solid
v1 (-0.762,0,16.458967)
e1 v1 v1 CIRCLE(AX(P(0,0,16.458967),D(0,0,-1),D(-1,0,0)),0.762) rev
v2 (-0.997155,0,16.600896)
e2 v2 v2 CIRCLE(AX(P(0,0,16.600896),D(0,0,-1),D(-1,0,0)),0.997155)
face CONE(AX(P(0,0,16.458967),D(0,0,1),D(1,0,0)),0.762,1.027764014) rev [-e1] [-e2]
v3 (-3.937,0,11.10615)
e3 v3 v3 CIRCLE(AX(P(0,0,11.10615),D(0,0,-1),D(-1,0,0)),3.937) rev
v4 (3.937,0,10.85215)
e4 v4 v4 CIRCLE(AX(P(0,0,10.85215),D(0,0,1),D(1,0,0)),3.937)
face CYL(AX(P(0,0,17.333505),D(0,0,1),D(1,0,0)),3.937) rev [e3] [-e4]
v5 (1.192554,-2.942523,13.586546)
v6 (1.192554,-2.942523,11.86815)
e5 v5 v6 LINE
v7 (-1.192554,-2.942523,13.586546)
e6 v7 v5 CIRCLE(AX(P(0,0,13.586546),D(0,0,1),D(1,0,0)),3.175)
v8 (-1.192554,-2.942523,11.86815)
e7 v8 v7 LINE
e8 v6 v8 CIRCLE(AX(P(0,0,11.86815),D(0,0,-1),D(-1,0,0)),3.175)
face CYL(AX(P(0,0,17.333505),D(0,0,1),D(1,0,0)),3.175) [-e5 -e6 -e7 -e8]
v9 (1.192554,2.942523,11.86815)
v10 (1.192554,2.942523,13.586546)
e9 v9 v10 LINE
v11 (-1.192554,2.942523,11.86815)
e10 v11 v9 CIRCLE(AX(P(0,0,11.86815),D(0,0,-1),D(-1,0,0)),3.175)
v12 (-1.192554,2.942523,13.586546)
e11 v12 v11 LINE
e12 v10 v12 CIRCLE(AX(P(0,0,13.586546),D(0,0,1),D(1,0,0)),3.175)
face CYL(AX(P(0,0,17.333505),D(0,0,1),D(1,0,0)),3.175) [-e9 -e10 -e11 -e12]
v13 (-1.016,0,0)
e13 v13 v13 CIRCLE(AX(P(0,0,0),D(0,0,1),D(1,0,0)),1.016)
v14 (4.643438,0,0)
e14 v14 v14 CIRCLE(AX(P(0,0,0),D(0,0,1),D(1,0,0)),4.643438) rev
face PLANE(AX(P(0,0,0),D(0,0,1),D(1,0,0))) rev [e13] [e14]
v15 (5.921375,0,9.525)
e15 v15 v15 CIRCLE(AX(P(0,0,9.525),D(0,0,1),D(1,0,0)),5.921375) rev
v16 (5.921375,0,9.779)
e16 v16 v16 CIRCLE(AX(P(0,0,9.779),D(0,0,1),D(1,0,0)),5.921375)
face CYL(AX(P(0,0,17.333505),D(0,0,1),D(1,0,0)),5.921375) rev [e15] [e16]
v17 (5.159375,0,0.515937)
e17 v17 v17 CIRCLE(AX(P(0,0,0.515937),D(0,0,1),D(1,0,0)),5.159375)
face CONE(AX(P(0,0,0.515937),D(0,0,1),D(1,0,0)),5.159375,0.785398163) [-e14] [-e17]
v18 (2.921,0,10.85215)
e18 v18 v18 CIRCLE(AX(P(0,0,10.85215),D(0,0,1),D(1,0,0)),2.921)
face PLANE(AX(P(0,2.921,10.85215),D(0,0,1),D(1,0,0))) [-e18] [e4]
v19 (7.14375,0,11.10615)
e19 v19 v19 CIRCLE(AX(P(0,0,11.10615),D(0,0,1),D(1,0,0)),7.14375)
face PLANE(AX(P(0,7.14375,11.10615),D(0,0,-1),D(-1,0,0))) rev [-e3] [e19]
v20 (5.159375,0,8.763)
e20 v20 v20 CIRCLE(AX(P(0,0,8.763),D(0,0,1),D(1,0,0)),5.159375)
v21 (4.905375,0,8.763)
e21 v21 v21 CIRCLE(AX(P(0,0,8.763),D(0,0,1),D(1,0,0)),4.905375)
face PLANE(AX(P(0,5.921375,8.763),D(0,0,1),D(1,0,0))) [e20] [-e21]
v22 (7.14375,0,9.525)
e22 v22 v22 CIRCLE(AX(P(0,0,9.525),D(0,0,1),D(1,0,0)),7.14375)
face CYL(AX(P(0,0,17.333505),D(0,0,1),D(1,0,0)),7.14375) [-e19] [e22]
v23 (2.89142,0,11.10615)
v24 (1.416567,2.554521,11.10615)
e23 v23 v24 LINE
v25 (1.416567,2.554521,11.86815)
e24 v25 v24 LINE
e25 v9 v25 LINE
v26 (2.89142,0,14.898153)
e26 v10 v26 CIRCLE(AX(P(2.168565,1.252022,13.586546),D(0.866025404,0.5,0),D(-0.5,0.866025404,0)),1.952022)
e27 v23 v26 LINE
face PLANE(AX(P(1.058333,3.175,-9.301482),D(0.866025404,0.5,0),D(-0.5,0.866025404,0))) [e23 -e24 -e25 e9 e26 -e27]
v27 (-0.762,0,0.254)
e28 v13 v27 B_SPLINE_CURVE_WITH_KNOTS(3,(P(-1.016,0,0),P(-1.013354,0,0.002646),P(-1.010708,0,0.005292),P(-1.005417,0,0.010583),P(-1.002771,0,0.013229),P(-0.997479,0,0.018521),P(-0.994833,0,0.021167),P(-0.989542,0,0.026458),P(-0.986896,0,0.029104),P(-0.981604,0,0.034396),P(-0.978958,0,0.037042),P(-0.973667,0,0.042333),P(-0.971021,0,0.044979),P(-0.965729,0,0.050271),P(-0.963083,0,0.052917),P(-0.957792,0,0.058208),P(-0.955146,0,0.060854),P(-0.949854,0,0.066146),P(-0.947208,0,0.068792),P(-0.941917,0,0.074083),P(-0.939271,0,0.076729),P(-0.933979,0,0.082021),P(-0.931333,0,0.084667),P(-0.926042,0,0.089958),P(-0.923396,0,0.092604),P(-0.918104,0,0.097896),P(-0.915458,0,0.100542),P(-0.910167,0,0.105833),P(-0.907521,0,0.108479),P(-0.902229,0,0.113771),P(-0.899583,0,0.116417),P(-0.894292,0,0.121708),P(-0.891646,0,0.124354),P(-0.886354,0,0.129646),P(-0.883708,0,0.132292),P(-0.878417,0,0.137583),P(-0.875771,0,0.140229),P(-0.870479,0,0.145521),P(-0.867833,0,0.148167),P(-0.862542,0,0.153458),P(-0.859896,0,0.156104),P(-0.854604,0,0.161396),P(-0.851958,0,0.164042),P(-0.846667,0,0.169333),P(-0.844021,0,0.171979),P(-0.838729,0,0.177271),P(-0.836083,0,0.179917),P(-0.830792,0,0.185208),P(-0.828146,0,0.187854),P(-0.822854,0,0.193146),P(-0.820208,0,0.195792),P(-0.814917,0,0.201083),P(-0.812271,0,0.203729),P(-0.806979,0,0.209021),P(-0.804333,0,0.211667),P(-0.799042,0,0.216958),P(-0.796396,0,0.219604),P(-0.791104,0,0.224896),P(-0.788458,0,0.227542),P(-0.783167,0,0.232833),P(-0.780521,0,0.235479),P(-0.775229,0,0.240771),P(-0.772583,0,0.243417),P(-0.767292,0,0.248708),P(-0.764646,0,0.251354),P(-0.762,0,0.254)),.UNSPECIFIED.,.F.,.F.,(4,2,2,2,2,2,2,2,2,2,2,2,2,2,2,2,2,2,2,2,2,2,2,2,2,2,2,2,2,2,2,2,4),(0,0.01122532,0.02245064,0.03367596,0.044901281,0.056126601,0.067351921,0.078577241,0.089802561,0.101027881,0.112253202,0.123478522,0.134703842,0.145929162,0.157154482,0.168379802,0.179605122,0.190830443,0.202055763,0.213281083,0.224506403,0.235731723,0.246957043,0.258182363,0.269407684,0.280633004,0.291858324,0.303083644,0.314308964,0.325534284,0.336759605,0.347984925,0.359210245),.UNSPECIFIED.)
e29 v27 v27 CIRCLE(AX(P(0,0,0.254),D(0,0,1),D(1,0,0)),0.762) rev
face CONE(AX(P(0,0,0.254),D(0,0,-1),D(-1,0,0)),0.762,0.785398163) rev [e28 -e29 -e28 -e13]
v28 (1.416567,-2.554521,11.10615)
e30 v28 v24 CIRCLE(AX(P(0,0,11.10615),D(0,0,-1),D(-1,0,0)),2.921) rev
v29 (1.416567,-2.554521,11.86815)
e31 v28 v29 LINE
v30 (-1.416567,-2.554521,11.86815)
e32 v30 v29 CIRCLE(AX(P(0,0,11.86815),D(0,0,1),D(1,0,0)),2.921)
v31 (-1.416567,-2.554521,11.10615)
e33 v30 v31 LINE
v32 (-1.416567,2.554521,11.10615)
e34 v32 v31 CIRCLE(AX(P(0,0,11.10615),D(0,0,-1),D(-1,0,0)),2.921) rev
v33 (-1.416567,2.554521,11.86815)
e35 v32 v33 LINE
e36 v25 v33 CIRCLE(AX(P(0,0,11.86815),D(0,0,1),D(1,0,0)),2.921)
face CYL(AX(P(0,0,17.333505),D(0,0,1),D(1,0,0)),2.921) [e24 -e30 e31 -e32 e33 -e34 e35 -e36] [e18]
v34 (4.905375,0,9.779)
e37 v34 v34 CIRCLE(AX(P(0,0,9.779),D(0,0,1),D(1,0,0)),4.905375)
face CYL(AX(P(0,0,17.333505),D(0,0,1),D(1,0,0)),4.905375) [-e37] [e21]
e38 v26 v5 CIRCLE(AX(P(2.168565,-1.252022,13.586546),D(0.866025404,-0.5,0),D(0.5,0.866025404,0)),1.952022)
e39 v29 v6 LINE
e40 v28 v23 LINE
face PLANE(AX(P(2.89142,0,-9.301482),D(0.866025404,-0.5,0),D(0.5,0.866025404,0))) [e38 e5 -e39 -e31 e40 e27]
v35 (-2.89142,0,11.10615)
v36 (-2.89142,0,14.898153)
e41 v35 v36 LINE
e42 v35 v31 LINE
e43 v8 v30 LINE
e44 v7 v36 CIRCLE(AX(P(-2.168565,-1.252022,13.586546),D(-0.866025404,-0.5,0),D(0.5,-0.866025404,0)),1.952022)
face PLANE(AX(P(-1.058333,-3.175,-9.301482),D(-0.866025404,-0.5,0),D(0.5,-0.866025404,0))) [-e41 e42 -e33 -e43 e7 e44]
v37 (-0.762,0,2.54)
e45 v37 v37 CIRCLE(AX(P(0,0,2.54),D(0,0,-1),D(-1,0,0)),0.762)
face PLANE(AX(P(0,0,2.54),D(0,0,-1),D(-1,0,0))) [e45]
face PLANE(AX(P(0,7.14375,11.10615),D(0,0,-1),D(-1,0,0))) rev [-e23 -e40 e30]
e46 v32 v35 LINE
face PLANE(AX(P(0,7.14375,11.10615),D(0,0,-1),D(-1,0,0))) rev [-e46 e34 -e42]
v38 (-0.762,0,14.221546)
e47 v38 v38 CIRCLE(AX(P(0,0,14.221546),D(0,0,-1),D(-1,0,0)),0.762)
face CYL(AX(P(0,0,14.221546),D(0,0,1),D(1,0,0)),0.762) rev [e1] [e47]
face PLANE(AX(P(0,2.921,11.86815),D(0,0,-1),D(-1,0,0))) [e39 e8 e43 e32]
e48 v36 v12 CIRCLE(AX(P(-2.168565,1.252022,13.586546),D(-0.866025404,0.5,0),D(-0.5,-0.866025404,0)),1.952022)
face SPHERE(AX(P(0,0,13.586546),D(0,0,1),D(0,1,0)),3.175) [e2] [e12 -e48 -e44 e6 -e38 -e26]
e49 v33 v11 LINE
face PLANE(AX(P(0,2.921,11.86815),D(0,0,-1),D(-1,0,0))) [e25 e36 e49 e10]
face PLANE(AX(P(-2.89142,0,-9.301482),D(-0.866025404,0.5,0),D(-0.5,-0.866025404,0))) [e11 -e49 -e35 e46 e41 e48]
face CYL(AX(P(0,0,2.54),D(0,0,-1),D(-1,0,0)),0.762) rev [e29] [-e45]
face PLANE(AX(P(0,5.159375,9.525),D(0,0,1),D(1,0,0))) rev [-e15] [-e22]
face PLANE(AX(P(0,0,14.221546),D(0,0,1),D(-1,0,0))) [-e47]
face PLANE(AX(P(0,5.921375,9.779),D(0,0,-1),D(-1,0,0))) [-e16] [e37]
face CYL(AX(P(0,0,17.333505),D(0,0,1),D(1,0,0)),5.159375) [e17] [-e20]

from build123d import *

# Parameters (mm, degrees)
SKETCH3_W          = 1.016
SKETCH3_H          = 1.016
CHAMFER1_SIZE      = 0.5159375
SKETCH2_R          = 0.762
CUT_EXTRUDE1_DEPTH = 2.54
CHAMFER2_SIZE      = 0.254
CHAMFER2_SIZE_2    = 0.209783356
SKETCH4_OUTSIDE_W  = 21.518
SKETCH4_OUTSIDE_H  = 21.518
CUT_EXTRUDE2_DEPTH = 5.655396081


with BuildPart() as part:
    # Sketch1 → Revolve1 (revolve)
    with BuildSketch(Plane(origin=(0, 0, 0), x_dir=(0, 0, -1), z_dir=(1, 0, 0)), mode=Mode.PRIVATE) as revolve1_sk:
        with BuildLine():
            Line((0, 0), (0, 5.159375))
            Line((0, 5.159375), (-9.525, 5.159375))
            Line((-9.525, 5.159375), (-9.525, 7.14375))
            Line((-9.525, 7.14375), (-11.10615, 7.14375))
            Line((-11.10615, 7.14375), (-11.10615, 3.175))
            Line((-11.10615, 3.175), (-13.586546081, 3.175))
            ThreePointArc((-13.586546081, 3.175), (-15.831610111, 2.24506403), (-16.761546081, 0))
            Line((-16.761546081, 0), (0, 0))
        make_face()
    revolve(revolve1_sk.sketch.rotate(Axis((0, 0, 17.33350529), (0, 0, -1)), 90), axis=Axis((0, 0, 17.33350529), (0, 0, -1)))

    # Sketch3 → Cut-Revolve1 (revolve, cut)
    with BuildSketch(Plane(origin=(0, 0, 0), x_dir=(0, 0, -1), z_dir=(1, 0, 0)), mode=Mode.PRIVATE) as cut_revolve1_sk:
        with Locations((-11.36015, 3.429)):
            Rectangle(SKETCH3_W, SKETCH3_H)
        with Locations((-9.271, 5.413375)):
            Rectangle(SKETCH3_W, SKETCH3_H)
    revolve(cut_revolve1_sk.sketch.rotate(Axis((0, 0, 17.33350529), (0, 0, -1)), 90), axis=Axis((0, 0, 17.33350529), (0, 0, -1)), mode=Mode.SUBTRACT)

    # Chamfer1
    chamfer1_edges = [part.edges().sort_by_distance(p)[0] for p in [
        (-5.159375, 0, 0),
    ]]
    chamfer(chamfer1_edges, length=CHAMFER1_SIZE)

    # Sketch2 → Cut-Extrude1 (cut)
    with BuildSketch(Plane(origin=(0, 0, 0), x_dir=(-1, 0, 0), z_dir=(0, 0, -1))):
        Circle(SKETCH2_R)
    cut_extrude1 = extrude(amount=-CUT_EXTRUDE1_DEPTH, mode=Mode.SUBTRACT)

    # Mirror1: Cut-Extrude1 across plane
    add(cut_extrude1.mirror(Plane.XY.offset(8.38077304)), mode=Mode.SUBTRACT)

    # Chamfer2
    # the kernel refuses this chamfer: 0.254, 0.209783356 mm, written as the material it takes off along each edge
    with BuildSketch(Plane(origin=(0, 0, 0), x_dir=(-1, 0, 0), z_dir=(0, -1, 0))) as chamfer2_piece_1:
        Polygon((0.762 + CHAMFER2_SIZE, 0), (0.762, -CHAMFER2_SIZE), (0.762, 0), align=None)
    revolve(axis=Axis((0, 0, 0), (0, 0, -1)), mode=Mode.SUBTRACT)
    with BuildSketch(Plane(origin=(1e-09, -1e-09, 16.66875), x_dir=(1.0, 1.2724919857814273e-09, -4.6623539153921465e-15), z_dir=(-1.2724919857814273e-09, 1.0, 2.691811803016297e-15))) as chamfer2_piece_2:
        with BuildLine():
            Line((0.997154657, 0.067853643), (0.761999999, CHAMFER2_SIZE_2))
            Line((0.761999999, CHAMFER2_SIZE_2), (0.761999999, 0))
            ThreePointArc((0.761999999, 0), (0.883545151, 0.032618216), (0.997154657, 0.067853643))
        make_face()
    revolve(axis=Axis((1e-09, -1e-09, 16.66875), (0, 0, -1)), revolution_arc=180.000000146, mode=Mode.SUBTRACT)
    with BuildSketch(Plane(origin=(1e-09, 1e-09, 16.66875), x_dir=(-1.0, -1.0948837603327353e-09, 4.6623539045804394e-15), z_dir=(1.0948837603327353e-09, -1.0, -8.075425709502658e-15))) as chamfer2_piece_3:
        with BuildLine():
            Line((0.997154658, 0.067853643), (0.761999999, 0.209783357))
            Line((0.761999999, 0.209783357), (0.762000001, 0))
            ThreePointArc((0.762000001, 0), (0.883545153, 0.032618216), (0.997154658, 0.067853643))
        make_face()
    revolve(axis=Axis((1e-09, 1e-09, 16.66875), (0, 0, -1)), revolution_arc=180.000000125, mode=Mode.SUBTRACT)

    # Sketch4 outside → Cut-Extrude2 (cut)
    with BuildSketch(Plane.XY.offset(16.761546081)):
        Rectangle(SKETCH4_OUTSIDE_W, SKETCH4_OUTSIDE_H)
        Polygon((-2.891420438, 0), (-1.058333333, 3.175), (1.058333333, 3.175), (2.891420438, 0), (1.058333333, -3.175), (-1.058333333, -3.175), align=None, mode=Mode.SUBTRACT)
    extrude(amount=-CUT_EXTRUDE2_DEPTH, mode=Mode.SUBTRACT)


solid = part.part
